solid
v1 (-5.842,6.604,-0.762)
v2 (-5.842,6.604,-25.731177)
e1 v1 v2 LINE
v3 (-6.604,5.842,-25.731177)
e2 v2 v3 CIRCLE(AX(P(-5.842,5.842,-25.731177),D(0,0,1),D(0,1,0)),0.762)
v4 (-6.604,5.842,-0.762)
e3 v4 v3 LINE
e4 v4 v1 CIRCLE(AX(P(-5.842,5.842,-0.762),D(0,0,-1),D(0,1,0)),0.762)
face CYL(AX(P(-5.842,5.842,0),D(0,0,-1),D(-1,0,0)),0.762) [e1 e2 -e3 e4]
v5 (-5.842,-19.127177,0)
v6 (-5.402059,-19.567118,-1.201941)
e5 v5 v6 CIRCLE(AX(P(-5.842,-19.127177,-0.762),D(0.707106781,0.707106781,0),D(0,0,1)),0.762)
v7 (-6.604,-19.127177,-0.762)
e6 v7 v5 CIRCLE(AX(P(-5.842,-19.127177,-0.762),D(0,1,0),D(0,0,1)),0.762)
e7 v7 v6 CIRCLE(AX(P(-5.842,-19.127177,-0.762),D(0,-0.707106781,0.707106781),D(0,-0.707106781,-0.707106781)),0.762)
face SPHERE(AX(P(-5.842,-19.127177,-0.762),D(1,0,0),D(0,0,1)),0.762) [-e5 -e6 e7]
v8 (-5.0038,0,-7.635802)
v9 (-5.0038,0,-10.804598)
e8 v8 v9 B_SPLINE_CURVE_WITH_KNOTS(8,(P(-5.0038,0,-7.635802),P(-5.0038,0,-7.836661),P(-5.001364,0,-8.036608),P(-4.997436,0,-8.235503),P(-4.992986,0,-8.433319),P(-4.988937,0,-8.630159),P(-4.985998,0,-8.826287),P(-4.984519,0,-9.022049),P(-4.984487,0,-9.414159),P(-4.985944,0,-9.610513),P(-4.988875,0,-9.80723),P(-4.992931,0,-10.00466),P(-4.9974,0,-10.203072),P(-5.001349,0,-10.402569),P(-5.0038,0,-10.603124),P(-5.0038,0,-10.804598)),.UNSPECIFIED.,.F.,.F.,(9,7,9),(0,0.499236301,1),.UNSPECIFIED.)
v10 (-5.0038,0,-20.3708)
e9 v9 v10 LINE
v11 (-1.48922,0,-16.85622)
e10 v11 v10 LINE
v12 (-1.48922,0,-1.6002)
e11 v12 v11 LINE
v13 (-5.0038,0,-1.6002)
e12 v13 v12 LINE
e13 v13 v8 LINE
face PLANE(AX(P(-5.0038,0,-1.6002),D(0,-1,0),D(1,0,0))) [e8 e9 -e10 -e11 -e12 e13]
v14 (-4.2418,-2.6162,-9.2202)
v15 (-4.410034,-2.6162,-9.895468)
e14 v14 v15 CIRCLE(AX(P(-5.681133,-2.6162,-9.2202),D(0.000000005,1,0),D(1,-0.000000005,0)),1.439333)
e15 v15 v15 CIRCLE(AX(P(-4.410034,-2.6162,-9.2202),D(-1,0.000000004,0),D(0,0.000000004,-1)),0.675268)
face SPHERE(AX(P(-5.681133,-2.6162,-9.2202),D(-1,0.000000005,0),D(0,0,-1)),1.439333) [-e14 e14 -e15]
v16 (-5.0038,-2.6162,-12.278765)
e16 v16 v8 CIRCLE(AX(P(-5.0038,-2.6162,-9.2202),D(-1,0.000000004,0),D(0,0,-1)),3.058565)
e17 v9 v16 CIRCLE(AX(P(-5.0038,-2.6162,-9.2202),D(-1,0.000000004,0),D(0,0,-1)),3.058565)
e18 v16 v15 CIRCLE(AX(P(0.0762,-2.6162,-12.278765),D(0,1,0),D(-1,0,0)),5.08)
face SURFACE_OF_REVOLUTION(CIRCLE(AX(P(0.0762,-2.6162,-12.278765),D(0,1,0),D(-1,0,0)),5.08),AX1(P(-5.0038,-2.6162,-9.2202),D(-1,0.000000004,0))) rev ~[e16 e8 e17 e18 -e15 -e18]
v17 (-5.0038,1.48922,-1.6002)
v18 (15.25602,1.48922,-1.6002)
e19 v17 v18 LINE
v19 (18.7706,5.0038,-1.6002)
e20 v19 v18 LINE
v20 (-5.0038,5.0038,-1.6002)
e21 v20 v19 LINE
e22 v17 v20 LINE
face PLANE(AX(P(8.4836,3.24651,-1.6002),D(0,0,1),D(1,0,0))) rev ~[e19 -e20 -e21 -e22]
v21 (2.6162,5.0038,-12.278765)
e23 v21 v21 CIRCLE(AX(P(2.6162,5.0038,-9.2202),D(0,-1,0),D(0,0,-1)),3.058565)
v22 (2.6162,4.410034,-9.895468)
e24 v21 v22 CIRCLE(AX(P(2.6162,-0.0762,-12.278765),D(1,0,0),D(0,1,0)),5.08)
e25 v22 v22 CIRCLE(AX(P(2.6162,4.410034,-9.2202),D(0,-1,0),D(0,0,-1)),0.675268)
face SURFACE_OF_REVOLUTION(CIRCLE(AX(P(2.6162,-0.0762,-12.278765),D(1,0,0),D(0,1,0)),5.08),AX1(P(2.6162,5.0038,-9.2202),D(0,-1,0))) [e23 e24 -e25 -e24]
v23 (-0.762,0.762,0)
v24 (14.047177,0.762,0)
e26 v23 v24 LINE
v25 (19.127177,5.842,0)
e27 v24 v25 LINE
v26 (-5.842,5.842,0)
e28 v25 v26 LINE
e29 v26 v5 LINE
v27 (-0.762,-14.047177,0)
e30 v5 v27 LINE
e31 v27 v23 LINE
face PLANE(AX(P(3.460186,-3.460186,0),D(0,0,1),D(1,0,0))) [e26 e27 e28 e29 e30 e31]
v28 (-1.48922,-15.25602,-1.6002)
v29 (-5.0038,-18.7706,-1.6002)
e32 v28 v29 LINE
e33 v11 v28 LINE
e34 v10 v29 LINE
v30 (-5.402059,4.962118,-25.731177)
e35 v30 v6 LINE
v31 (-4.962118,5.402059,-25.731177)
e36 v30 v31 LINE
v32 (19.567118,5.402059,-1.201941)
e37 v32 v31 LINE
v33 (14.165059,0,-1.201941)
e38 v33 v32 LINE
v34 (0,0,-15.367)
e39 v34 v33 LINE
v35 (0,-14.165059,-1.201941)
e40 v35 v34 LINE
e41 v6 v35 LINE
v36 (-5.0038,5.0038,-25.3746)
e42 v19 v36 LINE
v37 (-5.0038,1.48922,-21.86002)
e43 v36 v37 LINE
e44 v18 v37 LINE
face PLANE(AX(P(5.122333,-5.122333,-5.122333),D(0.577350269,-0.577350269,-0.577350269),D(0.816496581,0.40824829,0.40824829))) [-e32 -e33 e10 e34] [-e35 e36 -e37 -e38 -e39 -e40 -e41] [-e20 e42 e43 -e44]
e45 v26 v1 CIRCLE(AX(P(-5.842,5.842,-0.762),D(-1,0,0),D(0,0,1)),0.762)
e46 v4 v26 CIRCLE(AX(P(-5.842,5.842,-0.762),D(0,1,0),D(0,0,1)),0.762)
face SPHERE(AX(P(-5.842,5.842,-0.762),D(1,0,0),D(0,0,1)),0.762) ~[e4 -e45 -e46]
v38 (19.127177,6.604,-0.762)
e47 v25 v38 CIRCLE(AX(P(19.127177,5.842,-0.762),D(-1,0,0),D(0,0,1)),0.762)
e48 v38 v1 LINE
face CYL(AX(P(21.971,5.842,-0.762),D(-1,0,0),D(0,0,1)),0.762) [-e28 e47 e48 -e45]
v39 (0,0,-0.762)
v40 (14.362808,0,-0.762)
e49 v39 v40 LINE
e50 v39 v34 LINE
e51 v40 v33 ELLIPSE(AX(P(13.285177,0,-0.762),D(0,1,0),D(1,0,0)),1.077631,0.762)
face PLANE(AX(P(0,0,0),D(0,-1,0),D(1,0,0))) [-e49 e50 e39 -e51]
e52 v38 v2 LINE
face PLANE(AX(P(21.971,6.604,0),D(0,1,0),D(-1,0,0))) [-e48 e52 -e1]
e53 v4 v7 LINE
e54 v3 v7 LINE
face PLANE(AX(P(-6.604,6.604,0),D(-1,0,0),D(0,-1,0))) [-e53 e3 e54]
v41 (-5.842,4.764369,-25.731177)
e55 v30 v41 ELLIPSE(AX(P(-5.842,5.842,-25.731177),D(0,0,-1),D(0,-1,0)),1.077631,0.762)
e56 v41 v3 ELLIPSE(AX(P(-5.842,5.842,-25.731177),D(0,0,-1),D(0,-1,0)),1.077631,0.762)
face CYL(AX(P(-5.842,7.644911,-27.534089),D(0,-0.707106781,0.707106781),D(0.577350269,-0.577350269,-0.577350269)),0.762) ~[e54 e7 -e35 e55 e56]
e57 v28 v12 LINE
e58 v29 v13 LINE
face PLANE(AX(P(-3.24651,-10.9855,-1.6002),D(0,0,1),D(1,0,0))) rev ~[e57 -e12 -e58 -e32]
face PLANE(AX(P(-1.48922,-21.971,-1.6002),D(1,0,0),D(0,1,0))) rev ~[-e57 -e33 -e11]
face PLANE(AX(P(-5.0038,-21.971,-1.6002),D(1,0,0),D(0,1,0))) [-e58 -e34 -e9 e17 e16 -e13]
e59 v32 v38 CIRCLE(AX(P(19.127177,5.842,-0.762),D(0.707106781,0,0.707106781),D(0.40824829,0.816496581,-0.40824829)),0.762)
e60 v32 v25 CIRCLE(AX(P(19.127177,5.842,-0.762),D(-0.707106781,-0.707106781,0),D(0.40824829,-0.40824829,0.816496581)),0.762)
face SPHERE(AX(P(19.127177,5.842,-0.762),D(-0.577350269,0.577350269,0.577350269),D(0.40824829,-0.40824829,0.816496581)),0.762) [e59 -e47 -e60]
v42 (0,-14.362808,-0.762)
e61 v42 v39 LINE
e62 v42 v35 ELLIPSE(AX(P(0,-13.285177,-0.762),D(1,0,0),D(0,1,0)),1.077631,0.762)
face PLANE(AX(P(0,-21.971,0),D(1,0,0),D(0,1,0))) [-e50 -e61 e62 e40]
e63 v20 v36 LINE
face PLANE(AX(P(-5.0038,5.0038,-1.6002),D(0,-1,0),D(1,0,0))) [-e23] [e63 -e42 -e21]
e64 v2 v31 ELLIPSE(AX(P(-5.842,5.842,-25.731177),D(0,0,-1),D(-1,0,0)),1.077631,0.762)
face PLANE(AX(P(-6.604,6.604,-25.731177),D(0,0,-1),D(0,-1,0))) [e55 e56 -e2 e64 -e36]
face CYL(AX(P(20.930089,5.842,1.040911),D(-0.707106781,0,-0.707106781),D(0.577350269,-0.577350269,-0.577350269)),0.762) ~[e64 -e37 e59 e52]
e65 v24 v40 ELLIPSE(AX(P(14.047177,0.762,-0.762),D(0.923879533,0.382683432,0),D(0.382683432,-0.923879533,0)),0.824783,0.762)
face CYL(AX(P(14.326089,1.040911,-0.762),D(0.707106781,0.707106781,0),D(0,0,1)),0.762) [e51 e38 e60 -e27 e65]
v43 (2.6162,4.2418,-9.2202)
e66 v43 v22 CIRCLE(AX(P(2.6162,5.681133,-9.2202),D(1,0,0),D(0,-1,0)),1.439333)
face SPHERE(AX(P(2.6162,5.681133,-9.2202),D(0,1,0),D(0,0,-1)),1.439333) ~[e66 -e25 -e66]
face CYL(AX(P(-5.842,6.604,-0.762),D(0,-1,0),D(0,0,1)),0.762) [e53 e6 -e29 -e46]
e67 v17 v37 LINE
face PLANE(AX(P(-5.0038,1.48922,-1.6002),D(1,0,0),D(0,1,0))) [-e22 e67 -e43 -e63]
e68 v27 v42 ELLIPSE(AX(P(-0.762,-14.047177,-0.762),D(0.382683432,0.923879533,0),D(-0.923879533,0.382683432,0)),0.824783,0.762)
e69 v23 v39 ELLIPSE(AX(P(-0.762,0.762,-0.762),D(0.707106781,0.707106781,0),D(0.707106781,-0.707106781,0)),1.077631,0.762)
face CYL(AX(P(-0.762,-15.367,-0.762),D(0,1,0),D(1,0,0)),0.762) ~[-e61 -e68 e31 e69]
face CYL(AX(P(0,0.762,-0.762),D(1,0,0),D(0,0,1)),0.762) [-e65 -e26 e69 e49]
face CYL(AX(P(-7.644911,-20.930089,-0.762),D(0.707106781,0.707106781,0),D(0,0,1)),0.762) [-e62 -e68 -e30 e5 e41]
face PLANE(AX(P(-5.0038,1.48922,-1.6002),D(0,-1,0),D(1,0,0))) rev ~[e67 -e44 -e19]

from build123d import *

# Parameters (mm, degrees)
F1_DEPTH  = 28.575
F3_R      = 38.1
F4_DEPTH  = 32.9965678842
F6_W      = 26.9748
F6_H      = 3.5145800794
F6_W_2    = 3.5145800794
F6_H_2    = 21.971
F7_DEPTH  = 26.9758
F8_R      = 0.762
F15_W     = 1.8396307345
F15_H     = 1.8396307345
F16_DEPTH = 26.4941772846


# Not quite as in the source:
# - a fillet or chamfer that OpenCascade refuses, or shapes differently, is made with other operations: its cross-section is extruded or revolved along the edge and cut away or added
# - a pattern or mirror of a feature is missing from the dataset's text; its kind, count and spacing are read off the source's solid


with BuildPart() as f1:
    # F0 (on Top) → F1 (new body)
    with BuildSketch(Plane.XY):
        Polygon((0, -21.971), (0, 0), (21.971, 0), (21.971, 6.604), (-6.604, 6.604), (-6.604, -21.971), align=None)
    extrude(amount=-F1_DEPTH)

    # F3 (on 3pt) → F4 (cut, through all)
    with BuildSketch(Plane(origin=(5.1223333333, -5.1223333333, -5.1223333333), x_dir=(0.8164965809, 0.4082482905, 0.4082482905), z_dir=(0.5773502692, -0.5773502692, -0.5773502692))):
        Circle(F3_R)
    extrude(amount=F4_DEPTH, mode=Mode.SUBTRACT)

    # F6 (on offset) → F7 (cut, through all)
    with BuildSketch(Plane.XY.offset(-1.6002)):
        with Locations((8.4836, 3.2465099603)):
            Rectangle(F6_W, F6_H)
        with Locations((-3.2465099603, -10.9855)):
            Rectangle(F6_W_2, F6_H_2)
    extrude(amount=-F7_DEPTH, mode=Mode.SUBTRACT)

    # F8
    f8_edges = [f1.edges().sort_by_distance(p)[0] for p in [
        (7.6835, 6.604, 0),
        (18.669, 3.302, 0),
        (7.6835, 0, 0),
        (0, -7.6835, 0),
        (-3.302, -18.669, 0),
        (-6.604, -7.6835, 0),
        (-6.604, 6.604, -14.2875),
        (7.6835, 6.604, -14.2875),
        (-6.604, -7.6835, -14.2875),
    ]]
    fillet(f8_edges, radius=F8_R)

    # F10 (on offset) → F11 (revolve)
    with BuildSketch(Plane.YZ.offset(2.6162)):
        with BuildLine():
            ThreePointArc((4.2418, -9.2202), (4.4469151823, -9.9607308906), (5.0038, -10.4902))
            Line((5.0038, -10.4902), (5.0038, -9.2202))
            Line((5.0038, -9.2202), (4.2418, -9.2202))
        make_face()
    f11 = revolve(axis=Axis((2.6162, 4.6228, -9.2202), (0, -1, 0)))

    # F11_copies: F11 across plane
    add(f11.mirror(Plane(origin=(0, 0, 0), x_dir=(0.7071067796, -0.7071067828, 0), z_dir=(-0.7071067828, -0.7071067796, 0))))

    # F14: fillet of radius 5.08 on 3 edges, made by hand

    # F14_s1 → F14_t2 (revolve)
    with BuildSketch(Plane.YZ.offset(2.6162)):
        with BuildLine():
            ThreePointArc((5.0038, -12.278765023), (4.853123865, -11.0506908258), (4.4100337662, -9.8954676025))
            ThreePointArc((4.4100337662, -9.8954676025), (4.662543942, -10.2371346569), (5.0038, -10.4902))
            Line((5.0038, -10.4902), (5.0038, -12.278765023))
        make_face()
    revolve(axis=Axis((2.6162, 5.0038, -9.2202), (0, -1, 0)))

    # F14_s3 → F14_t4 (revolve)
    with BuildSketch(Plane.XZ.offset(2.6161999777)):
        with BuildLine():
            ThreePointArc((-5.0038, -12.2787650011), (-4.8531238674, -11.0506908133), (-4.4100337753, -9.8954675976))
            ThreePointArc((-4.4100337753, -9.8954675976), (-4.6625439517, -10.237134655), (-5.0038000116, -10.4902))
            Line((-5.0038000116, -10.4902), (-5.0038, -12.2787650011))
        make_face()
    revolve(axis=Axis((-5.0038000116, -2.6161999777, -9.2202), (-1, 4.4e-09, 0)))

    # F15 (on face) → F16 (cut, through all)
    with BuildSketch(Plane(origin=(-6.604, 0, 0), x_dir=(0, -1, 0), z_dir=(-1, 0, 0))):
        with Locations((-5.6841846327, -26.6509926519)):
            Rectangle(F15_W, F15_H)
    extrude(amount=-F16_DEPTH, mode=Mode.SUBTRACT)


solid = f1.part
